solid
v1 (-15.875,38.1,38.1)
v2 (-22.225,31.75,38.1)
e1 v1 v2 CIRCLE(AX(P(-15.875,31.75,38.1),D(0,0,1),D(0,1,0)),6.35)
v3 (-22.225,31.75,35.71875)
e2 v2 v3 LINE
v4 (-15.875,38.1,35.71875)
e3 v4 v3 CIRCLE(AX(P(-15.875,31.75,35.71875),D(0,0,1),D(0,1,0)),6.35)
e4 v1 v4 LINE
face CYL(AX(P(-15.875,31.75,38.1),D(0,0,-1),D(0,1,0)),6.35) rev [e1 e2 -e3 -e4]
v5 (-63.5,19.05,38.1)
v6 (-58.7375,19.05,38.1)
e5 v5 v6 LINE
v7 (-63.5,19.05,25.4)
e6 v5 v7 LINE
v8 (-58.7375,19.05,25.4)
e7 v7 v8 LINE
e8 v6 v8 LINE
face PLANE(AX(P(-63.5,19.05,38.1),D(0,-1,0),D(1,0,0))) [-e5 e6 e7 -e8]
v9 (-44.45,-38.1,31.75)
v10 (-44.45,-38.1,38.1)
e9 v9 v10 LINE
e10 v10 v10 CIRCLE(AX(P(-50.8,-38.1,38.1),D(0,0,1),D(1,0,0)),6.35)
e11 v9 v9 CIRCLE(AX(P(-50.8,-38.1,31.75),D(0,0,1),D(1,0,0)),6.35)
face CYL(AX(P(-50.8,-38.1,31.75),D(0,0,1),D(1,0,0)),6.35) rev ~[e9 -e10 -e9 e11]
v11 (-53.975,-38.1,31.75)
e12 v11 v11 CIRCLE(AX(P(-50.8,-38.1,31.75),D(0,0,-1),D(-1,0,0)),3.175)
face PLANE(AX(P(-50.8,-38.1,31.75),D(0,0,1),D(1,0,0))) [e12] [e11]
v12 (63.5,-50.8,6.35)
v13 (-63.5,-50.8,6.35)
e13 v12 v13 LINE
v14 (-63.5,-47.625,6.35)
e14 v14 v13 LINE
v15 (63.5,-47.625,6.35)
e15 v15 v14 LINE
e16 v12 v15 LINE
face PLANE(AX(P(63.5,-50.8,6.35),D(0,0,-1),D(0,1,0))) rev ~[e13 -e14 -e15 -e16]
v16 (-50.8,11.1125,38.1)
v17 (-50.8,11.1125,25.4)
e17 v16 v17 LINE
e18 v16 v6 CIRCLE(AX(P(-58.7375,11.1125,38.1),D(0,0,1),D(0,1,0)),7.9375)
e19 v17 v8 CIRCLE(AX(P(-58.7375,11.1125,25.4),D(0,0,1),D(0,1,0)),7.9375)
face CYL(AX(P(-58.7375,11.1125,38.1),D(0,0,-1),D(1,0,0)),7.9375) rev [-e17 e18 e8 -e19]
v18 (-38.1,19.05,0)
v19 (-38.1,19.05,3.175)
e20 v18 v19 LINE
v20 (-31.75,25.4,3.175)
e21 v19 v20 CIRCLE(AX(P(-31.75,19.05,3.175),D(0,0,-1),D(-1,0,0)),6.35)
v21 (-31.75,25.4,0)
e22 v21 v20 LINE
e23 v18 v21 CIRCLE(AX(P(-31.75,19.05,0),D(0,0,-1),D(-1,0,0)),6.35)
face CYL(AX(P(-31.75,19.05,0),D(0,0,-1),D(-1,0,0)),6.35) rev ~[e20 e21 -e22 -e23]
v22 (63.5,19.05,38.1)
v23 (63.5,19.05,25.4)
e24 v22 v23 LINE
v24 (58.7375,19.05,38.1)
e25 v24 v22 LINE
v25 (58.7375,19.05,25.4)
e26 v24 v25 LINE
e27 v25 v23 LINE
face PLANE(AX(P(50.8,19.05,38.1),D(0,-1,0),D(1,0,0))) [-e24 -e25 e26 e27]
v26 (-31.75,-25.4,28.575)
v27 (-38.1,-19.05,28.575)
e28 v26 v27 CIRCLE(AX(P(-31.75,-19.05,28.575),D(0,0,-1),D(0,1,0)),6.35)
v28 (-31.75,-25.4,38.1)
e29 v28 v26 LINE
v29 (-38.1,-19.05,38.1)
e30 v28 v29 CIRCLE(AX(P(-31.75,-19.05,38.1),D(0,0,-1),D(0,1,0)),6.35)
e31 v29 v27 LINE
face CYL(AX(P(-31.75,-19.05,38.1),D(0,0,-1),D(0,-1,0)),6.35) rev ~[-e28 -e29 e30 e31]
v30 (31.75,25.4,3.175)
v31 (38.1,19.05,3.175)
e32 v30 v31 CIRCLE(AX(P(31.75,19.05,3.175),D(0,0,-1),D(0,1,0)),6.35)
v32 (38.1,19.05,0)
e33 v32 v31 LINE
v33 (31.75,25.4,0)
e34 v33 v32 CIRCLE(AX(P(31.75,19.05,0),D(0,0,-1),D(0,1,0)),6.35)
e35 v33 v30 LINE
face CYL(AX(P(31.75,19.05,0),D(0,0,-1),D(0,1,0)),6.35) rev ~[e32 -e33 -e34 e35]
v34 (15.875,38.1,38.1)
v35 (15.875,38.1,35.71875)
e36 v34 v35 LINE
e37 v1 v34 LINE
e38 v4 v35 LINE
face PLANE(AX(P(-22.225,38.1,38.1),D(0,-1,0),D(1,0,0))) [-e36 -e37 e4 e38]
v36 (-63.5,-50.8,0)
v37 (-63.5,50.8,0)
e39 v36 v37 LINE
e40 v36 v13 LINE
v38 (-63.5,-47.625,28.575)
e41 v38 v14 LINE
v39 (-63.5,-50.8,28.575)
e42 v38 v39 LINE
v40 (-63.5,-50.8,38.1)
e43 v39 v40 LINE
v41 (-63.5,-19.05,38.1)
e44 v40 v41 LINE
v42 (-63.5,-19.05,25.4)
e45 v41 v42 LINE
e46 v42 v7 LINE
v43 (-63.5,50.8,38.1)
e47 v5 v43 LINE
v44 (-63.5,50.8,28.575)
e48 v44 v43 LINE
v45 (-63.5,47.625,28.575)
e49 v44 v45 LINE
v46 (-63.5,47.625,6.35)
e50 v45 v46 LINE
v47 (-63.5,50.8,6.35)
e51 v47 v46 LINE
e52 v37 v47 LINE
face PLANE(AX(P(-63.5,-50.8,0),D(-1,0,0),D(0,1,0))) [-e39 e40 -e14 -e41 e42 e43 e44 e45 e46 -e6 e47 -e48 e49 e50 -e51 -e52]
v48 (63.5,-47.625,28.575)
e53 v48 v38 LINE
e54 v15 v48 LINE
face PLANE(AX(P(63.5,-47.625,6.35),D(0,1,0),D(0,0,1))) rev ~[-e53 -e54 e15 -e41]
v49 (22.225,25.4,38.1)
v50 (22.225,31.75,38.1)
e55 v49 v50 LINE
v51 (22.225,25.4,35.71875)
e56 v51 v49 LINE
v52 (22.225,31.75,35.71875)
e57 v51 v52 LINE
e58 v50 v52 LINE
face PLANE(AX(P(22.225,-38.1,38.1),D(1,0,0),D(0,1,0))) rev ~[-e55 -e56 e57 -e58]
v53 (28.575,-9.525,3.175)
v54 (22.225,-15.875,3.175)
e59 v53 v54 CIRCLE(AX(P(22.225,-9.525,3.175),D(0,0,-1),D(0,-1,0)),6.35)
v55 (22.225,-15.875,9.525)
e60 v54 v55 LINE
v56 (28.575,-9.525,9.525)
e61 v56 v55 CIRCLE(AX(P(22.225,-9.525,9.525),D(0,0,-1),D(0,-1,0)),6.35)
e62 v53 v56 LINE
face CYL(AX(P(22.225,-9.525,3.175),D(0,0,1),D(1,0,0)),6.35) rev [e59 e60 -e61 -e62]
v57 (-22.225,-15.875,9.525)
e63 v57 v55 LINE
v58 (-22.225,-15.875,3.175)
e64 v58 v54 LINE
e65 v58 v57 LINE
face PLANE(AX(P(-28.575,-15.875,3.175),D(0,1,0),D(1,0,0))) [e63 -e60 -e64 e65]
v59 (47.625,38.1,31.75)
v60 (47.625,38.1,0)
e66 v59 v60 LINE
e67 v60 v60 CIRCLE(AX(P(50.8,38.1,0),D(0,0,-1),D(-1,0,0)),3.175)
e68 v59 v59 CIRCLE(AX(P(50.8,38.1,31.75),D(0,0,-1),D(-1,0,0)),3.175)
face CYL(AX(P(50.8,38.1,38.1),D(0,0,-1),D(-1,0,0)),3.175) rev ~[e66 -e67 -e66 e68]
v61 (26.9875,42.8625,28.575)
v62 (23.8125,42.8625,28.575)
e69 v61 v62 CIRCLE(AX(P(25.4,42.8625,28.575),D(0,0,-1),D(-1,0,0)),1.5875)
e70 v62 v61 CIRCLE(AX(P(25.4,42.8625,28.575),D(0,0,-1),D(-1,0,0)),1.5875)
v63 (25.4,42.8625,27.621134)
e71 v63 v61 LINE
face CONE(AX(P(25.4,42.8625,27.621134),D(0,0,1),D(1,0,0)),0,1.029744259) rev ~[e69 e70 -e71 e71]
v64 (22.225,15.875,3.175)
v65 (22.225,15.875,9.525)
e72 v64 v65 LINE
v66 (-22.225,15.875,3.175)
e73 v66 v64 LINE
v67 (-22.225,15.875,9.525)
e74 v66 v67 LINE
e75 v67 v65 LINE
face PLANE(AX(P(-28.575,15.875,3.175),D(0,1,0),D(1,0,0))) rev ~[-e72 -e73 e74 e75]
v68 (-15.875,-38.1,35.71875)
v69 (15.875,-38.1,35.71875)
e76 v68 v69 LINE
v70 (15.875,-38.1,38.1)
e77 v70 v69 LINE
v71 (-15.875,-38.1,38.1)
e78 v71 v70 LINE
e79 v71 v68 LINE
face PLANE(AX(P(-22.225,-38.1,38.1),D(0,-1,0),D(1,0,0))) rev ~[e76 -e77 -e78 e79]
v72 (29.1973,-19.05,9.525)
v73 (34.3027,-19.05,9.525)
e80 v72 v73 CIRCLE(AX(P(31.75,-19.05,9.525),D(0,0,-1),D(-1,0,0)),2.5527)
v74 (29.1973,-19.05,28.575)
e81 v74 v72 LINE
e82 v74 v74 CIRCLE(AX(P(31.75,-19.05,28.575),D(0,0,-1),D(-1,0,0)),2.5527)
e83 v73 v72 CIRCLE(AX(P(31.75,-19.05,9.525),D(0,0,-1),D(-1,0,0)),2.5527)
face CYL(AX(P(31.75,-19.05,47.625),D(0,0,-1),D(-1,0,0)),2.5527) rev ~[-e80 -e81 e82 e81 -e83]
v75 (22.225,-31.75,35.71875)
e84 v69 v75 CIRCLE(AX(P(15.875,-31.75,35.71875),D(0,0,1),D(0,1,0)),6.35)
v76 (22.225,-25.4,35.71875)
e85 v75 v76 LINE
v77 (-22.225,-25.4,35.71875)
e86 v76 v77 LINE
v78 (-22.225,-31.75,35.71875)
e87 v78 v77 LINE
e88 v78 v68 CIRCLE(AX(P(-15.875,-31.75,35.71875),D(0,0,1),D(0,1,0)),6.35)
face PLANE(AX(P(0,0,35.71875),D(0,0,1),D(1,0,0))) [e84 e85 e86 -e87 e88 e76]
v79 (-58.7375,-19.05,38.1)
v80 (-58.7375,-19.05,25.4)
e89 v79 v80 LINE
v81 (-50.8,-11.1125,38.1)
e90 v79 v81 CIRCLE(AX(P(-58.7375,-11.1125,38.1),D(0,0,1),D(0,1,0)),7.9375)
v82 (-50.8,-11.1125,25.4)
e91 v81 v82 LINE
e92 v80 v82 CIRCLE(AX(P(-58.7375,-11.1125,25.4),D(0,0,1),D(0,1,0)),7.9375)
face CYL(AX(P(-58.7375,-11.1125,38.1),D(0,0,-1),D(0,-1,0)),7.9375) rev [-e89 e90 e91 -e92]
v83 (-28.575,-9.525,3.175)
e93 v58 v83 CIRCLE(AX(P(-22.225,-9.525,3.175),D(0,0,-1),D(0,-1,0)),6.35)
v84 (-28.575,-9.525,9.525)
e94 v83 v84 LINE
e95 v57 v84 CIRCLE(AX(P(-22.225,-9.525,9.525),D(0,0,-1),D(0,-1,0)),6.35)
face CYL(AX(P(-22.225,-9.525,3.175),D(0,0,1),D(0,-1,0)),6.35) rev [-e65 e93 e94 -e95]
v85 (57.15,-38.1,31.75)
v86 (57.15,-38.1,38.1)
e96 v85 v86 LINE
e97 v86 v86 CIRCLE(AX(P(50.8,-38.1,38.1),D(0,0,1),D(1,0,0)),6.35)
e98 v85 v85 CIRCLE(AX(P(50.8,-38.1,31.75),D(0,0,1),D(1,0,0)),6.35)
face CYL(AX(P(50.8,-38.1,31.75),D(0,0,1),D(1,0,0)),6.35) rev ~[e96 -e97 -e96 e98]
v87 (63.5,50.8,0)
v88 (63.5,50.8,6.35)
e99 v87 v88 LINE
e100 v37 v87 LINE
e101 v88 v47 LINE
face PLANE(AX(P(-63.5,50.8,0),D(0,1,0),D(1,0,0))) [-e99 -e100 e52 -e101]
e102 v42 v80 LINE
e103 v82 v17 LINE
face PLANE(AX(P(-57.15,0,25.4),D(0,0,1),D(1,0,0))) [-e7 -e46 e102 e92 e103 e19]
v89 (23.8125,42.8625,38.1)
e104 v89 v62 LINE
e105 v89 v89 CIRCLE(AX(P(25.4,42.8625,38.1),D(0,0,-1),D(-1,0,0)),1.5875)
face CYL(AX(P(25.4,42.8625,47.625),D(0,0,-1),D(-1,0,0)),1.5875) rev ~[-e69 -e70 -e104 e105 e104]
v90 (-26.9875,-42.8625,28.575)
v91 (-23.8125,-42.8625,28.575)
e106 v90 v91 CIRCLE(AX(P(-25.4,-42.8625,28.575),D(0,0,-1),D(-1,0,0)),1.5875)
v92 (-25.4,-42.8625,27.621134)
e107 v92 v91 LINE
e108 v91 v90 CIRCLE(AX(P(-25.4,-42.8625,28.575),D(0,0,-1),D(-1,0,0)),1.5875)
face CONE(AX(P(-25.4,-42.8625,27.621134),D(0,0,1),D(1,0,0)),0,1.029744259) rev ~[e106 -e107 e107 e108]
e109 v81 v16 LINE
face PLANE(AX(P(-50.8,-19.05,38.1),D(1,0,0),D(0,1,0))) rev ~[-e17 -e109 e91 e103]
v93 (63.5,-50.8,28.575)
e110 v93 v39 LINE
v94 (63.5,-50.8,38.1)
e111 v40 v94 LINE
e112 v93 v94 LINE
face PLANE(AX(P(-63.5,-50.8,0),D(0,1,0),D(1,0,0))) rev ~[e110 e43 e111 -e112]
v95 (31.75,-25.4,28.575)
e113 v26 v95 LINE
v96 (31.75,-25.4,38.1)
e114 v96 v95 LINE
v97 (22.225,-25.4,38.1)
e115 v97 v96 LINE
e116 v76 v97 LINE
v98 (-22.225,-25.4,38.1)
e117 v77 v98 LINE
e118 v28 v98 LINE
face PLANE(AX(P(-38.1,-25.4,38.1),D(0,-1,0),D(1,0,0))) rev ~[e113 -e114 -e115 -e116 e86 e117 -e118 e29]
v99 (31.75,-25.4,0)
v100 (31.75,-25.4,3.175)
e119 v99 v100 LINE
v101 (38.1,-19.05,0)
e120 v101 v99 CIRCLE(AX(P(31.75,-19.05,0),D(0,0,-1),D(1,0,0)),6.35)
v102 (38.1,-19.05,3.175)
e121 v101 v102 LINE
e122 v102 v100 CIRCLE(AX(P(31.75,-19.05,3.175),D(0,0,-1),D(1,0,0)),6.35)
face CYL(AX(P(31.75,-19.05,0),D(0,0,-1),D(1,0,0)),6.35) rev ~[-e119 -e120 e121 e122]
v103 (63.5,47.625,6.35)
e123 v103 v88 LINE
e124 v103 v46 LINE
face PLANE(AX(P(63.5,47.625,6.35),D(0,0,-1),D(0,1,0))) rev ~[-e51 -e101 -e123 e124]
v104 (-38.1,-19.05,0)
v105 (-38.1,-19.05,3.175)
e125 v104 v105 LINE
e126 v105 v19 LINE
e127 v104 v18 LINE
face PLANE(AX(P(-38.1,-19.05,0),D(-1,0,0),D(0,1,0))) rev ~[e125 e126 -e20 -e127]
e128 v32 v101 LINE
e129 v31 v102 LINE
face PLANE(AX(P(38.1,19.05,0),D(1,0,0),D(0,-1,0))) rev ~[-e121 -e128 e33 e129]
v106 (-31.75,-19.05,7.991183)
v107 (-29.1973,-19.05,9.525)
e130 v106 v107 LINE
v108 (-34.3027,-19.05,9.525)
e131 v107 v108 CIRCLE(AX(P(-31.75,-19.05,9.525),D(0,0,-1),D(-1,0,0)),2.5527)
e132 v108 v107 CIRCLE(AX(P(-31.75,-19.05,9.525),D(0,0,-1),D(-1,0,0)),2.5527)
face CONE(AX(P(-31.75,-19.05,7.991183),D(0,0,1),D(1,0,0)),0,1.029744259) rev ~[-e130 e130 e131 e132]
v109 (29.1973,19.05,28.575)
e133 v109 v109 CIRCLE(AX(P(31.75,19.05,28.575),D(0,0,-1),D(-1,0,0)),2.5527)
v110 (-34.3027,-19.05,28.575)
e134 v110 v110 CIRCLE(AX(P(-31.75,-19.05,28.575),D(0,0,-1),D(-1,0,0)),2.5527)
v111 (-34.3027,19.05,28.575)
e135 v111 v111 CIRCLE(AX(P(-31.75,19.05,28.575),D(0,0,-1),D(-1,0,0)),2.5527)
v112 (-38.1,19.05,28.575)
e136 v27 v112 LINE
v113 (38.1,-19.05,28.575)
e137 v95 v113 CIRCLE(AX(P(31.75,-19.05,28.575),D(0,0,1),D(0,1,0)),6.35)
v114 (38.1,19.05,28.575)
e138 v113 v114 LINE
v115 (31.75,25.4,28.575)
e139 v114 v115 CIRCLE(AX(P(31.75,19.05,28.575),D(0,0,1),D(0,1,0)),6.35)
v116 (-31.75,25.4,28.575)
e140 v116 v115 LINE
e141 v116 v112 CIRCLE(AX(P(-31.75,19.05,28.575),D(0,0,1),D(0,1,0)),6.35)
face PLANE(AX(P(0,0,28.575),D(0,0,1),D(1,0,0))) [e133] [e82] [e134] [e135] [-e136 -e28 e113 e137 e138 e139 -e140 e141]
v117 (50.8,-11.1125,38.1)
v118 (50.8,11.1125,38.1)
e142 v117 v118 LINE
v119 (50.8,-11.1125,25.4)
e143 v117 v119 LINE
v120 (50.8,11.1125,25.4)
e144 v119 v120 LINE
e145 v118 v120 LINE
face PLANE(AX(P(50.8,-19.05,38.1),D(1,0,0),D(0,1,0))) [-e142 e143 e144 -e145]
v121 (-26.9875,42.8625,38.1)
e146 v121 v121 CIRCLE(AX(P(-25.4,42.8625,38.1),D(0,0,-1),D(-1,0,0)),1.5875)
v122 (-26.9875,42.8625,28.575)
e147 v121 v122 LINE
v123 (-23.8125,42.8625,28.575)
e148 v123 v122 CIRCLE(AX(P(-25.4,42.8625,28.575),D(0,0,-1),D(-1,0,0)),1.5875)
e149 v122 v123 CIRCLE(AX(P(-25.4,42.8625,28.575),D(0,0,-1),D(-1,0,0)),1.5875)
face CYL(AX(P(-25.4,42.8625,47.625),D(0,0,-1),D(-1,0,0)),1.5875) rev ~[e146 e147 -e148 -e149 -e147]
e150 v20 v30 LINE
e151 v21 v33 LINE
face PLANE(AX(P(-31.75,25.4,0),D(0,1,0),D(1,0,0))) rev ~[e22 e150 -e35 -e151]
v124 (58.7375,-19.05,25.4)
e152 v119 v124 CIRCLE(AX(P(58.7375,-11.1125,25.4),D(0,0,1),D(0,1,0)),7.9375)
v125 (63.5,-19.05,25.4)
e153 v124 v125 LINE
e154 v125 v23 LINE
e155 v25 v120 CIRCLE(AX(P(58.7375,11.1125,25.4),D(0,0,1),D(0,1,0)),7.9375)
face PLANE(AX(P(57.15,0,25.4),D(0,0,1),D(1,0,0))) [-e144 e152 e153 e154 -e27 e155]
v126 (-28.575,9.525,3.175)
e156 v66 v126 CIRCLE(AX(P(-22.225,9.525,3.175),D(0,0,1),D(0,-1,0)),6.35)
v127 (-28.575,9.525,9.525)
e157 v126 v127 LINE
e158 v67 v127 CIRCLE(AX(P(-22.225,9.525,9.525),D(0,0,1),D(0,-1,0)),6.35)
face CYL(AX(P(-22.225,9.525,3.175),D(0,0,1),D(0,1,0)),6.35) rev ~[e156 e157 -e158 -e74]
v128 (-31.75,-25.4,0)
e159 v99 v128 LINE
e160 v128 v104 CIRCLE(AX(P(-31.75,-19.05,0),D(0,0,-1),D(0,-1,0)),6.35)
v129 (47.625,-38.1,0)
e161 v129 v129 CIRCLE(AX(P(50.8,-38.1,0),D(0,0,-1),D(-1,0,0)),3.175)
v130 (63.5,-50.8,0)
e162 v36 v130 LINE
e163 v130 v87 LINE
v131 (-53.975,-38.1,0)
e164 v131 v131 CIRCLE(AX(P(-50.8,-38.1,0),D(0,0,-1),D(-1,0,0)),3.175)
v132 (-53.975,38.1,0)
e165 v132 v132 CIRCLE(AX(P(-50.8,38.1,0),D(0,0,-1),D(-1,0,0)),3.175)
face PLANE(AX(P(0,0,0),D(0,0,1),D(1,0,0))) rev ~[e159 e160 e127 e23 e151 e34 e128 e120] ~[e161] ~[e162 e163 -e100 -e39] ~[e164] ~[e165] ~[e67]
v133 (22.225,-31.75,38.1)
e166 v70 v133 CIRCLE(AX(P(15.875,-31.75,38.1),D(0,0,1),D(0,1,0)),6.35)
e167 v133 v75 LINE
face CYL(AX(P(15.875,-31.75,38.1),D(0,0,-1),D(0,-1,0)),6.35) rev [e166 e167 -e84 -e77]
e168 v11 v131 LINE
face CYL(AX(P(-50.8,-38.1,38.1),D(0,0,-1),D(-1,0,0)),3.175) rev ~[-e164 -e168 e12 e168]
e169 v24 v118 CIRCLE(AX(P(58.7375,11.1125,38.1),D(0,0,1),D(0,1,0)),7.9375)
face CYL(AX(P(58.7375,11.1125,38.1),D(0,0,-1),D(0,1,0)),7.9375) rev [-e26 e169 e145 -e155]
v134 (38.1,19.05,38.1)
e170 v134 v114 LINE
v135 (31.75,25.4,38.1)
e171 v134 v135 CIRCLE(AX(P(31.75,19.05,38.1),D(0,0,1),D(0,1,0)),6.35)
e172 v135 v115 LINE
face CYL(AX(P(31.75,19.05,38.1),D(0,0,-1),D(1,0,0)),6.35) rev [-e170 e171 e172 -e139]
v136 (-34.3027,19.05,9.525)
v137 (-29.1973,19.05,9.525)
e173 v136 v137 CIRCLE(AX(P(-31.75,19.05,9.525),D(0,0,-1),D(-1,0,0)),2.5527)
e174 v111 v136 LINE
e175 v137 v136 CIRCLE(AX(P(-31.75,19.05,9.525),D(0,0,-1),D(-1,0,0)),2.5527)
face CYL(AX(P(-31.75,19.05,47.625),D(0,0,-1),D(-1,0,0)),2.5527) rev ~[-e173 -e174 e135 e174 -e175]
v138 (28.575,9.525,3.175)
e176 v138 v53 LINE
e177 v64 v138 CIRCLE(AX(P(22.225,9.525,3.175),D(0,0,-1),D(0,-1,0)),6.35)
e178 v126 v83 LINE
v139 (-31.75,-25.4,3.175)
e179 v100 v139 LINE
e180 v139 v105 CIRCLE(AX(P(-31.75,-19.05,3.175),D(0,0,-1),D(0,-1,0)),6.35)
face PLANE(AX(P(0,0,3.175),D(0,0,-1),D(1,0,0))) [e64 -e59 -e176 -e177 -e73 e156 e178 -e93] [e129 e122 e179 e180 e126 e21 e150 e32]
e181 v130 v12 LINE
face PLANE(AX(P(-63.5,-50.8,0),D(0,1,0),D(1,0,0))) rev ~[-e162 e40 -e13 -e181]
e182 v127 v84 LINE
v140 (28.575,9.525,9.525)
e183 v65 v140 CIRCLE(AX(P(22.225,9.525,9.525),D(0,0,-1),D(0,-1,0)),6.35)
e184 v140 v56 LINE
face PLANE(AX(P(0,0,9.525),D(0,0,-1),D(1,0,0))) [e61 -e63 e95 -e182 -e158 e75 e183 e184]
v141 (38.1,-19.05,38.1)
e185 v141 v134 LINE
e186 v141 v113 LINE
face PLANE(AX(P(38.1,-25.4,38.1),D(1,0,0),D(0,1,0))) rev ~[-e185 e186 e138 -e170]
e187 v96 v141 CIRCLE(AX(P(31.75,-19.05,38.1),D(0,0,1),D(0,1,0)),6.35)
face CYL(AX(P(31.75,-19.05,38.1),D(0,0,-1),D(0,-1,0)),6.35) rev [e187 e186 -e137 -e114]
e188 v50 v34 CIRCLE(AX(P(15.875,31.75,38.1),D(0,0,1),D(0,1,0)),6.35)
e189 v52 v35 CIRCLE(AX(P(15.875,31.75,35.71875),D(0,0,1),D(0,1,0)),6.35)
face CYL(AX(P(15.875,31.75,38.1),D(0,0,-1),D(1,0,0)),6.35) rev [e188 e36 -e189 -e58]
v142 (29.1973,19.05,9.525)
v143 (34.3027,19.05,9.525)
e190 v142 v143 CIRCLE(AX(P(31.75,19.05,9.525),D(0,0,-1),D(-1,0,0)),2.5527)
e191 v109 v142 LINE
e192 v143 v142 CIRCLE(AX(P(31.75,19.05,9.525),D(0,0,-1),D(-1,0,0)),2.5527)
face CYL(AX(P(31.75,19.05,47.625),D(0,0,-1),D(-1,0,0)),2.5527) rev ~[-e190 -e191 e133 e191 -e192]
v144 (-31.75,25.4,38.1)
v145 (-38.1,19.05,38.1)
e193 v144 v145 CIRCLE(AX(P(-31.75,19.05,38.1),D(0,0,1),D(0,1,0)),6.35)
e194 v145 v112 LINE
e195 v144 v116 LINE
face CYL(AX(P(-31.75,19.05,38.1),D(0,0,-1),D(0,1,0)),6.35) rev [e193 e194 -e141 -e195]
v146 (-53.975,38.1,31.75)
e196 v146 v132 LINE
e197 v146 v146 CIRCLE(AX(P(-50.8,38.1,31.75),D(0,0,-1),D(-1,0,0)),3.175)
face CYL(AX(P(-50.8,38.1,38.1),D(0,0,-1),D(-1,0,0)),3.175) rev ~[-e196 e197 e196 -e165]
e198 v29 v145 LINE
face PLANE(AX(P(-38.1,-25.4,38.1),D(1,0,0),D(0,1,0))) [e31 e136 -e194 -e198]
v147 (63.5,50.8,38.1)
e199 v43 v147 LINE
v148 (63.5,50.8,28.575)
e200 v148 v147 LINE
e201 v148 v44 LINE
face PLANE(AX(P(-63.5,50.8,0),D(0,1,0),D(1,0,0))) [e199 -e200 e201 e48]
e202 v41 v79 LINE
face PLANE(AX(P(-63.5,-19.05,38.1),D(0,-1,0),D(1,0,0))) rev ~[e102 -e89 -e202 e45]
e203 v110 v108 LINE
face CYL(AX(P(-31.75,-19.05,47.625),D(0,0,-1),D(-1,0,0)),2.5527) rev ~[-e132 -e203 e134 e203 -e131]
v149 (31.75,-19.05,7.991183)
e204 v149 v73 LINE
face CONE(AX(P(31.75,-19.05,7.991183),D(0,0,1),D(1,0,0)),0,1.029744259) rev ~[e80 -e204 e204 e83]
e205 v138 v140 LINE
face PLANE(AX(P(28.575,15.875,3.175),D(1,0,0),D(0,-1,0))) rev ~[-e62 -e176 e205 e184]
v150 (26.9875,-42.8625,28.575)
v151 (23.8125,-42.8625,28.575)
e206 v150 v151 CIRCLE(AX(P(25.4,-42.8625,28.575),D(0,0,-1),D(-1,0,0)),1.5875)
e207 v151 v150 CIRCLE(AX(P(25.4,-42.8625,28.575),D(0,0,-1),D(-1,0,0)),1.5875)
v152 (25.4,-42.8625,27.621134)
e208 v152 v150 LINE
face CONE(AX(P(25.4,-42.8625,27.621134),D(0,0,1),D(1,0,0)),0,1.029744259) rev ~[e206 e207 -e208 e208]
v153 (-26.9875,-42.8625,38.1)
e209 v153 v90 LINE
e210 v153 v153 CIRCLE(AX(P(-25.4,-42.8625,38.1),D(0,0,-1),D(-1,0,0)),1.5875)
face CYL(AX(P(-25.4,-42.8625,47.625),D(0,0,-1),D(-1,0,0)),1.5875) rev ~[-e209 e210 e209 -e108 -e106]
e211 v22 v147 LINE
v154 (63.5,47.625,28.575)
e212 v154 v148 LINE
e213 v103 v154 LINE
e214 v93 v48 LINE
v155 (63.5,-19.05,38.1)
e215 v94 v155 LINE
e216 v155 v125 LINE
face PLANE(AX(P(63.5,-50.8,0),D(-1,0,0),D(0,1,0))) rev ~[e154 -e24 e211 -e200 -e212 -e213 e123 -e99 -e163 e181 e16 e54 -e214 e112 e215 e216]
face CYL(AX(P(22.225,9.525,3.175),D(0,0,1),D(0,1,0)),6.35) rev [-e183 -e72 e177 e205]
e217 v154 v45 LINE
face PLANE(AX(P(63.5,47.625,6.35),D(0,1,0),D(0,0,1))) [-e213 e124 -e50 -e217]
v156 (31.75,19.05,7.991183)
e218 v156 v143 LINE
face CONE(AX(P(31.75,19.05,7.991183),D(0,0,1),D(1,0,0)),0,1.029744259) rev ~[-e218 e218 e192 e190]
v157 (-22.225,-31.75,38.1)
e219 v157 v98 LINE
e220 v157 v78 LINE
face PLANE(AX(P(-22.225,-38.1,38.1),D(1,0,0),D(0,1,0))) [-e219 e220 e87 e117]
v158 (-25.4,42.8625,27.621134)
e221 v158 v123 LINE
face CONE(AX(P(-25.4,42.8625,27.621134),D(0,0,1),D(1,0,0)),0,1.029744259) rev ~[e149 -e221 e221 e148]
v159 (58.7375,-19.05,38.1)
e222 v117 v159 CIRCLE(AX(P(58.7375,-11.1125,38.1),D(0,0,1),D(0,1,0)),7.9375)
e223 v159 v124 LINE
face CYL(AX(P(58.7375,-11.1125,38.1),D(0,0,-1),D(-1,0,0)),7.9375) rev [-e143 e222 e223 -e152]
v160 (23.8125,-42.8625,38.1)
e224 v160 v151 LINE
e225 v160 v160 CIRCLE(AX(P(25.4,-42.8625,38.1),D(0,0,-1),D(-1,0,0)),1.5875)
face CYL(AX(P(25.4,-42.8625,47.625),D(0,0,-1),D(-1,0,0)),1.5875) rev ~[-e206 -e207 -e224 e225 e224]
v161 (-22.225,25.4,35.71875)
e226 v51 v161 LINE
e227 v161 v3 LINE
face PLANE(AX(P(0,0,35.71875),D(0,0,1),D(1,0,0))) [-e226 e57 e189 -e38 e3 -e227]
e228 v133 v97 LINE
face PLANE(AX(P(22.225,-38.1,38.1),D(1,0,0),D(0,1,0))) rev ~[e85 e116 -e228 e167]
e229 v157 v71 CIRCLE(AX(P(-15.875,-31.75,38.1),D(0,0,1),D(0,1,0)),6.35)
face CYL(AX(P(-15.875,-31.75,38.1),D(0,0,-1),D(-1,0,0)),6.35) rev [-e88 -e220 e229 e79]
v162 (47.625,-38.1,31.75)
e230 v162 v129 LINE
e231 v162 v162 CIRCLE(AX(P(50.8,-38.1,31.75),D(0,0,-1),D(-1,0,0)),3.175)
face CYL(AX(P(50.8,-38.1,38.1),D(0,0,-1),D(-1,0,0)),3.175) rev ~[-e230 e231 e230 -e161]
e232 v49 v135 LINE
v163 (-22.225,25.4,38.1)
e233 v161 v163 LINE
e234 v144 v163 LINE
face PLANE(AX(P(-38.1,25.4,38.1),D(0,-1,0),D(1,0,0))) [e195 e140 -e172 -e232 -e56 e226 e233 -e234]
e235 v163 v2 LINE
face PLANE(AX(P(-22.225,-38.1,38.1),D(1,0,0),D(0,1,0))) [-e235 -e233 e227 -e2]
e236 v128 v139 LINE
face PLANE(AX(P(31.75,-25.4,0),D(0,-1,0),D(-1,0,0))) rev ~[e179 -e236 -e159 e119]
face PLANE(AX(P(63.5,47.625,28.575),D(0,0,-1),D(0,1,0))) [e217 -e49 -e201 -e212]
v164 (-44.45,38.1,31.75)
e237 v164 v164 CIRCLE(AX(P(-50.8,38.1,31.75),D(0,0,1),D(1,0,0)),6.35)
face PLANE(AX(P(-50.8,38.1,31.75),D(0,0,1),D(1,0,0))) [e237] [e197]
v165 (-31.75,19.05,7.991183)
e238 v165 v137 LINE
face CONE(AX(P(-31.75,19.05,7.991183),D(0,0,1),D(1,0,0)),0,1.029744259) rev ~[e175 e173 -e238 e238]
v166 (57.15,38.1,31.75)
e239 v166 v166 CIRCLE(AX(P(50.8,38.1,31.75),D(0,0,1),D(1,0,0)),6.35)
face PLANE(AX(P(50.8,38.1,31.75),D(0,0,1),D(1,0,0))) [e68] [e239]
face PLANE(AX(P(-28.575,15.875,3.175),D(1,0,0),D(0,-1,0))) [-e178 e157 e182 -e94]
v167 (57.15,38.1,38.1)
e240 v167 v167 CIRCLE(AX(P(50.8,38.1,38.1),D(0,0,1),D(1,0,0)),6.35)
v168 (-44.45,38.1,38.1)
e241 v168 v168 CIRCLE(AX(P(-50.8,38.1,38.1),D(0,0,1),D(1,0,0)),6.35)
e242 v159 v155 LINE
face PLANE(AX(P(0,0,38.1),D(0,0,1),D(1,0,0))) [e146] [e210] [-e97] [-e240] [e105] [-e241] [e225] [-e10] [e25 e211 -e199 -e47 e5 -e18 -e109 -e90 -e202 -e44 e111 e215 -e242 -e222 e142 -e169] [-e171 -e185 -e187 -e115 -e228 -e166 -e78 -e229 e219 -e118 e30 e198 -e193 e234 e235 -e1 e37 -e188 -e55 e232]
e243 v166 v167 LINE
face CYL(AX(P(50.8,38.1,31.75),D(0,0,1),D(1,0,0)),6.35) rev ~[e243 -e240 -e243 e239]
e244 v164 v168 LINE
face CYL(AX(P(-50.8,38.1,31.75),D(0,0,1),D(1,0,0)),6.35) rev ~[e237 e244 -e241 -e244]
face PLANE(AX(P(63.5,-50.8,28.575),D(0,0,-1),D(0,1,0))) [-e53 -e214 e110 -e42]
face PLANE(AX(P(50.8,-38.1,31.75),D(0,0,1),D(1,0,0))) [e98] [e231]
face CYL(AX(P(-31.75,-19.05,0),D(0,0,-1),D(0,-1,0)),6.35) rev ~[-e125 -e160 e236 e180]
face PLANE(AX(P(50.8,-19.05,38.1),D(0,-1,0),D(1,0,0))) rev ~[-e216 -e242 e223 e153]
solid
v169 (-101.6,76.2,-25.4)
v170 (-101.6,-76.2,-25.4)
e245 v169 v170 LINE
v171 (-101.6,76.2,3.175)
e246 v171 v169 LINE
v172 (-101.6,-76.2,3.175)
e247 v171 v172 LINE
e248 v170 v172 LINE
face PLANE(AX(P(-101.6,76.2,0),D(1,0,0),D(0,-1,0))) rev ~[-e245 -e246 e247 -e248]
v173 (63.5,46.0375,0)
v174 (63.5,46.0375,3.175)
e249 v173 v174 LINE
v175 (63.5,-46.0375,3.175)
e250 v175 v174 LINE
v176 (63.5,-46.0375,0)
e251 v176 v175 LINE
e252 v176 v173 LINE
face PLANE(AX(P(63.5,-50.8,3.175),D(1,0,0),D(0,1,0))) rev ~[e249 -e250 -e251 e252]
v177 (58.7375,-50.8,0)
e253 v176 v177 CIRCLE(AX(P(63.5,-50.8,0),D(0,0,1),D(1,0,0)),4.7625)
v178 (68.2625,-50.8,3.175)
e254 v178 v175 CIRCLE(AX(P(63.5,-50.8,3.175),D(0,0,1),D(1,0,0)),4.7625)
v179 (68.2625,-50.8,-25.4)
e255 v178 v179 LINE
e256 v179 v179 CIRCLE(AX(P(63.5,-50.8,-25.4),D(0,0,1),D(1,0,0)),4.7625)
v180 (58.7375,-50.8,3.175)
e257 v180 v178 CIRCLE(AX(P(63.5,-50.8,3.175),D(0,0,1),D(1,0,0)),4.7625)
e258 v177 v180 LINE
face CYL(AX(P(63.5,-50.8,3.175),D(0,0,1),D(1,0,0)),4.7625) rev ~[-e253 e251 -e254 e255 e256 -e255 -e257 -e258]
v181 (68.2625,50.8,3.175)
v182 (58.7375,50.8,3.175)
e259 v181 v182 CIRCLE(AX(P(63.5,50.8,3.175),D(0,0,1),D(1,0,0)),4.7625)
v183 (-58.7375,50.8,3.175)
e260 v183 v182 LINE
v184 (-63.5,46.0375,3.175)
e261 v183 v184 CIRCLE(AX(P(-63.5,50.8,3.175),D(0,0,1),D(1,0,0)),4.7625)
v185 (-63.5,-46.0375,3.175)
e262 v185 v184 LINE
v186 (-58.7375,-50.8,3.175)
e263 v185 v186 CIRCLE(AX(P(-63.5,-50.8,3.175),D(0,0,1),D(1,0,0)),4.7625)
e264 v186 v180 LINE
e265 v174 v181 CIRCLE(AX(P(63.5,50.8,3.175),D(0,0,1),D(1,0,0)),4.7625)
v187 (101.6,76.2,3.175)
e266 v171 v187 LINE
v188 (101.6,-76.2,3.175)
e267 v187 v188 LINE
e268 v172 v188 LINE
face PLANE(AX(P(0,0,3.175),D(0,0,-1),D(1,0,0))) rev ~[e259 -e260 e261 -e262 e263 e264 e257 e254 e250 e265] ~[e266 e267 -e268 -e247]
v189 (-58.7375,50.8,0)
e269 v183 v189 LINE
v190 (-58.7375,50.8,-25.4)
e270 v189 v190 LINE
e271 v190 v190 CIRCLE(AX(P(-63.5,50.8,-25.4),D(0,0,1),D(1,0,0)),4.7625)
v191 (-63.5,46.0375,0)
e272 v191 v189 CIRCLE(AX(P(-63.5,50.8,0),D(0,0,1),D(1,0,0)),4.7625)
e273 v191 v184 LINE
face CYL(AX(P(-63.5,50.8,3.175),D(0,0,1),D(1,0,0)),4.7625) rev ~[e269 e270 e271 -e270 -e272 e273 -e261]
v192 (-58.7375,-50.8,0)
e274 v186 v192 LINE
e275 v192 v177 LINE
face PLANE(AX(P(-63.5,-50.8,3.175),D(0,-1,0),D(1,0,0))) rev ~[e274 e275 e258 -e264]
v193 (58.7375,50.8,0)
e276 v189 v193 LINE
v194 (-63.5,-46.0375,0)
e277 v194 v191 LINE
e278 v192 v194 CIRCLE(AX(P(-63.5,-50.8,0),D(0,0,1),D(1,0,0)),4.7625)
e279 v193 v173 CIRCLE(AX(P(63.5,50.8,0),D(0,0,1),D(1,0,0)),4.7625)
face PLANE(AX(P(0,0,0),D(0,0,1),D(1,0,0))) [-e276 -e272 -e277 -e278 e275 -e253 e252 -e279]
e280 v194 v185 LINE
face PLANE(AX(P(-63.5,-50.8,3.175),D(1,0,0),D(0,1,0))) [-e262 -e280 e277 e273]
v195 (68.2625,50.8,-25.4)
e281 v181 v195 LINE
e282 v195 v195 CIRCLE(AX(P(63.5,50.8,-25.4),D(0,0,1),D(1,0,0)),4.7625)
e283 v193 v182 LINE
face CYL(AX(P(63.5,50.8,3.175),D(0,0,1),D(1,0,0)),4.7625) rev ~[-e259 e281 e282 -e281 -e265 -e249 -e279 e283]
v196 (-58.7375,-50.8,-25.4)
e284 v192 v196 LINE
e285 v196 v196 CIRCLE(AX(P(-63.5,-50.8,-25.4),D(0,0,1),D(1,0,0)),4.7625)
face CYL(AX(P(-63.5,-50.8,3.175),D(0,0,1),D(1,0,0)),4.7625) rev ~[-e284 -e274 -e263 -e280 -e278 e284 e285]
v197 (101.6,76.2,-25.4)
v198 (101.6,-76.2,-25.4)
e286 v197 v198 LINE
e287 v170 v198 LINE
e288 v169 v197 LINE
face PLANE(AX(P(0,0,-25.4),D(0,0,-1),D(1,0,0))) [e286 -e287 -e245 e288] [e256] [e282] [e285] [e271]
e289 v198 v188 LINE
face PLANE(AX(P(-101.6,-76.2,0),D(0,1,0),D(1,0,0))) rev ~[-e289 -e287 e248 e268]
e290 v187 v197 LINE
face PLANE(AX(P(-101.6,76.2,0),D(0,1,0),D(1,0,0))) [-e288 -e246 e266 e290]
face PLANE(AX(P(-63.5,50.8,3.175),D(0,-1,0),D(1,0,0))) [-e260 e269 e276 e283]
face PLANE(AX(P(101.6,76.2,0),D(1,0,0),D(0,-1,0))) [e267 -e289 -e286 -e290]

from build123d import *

# Parameters (mm, degrees)
F0_W           = 127
F0_H           = 101.6
F1_DEPTH       = 38.1
F2_W           = 76.2
F2_H           = 50.8
F3_DEPTH       = 9.525
F4_R           = 6.35
F6_D           = 6.35
F6_CBORE_D     = 12.7
F6_CBORE_DEPTH = 6.35
F7_W           = 3.175
F7_H           = 22.225
F8_DEPTH       = 127.001
F10_D          = 5.1054
F10_DEPTH      = 19.05
F10_TIP        = 1.5338169022
F11_W          = 12.7
F11_H          = 38.1
F12_DEPTH      = 12.7
F13_R          = 7.9375
F15_DEPTH      = 3.175
F16_W          = 57.15
F16_H          = 31.75
F17_DEPTH      = 6.35
F18_R          = 6.35
F20_D          = 3.175
F20_DEPTH      = 9.525
F20_TIP        = 0.9538662327
F21_W          = 44.45
F21_H          = 76.2
F22_DEPTH      = 2.38125
F23_R          = 6.35
F24_W          = 203.2
F24_H          = 152.4
F25_DEPTH      = 25.4
F25_DEPTH_BACK = 3.175
F26_W          = 127
F26_H          = 101.6
F27_DEPTH      = 3.175
F28_R          = 4.7625
F29_DEPTH      = 28.576


with BuildPart() as f1:
    # F0 (on Top) → F1 (new body)
    with BuildSketch(Plane.XY):
        Rectangle(F0_W, F0_H)
    extrude(amount=F1_DEPTH)

    # F2 (on face) → F3 (cut)
    with BuildSketch(Plane.XY.offset(38.1)):
        Rectangle(F2_W, F2_H)
    extrude(amount=-F3_DEPTH, mode=Mode.SUBTRACT)

    # F4
    f4_edges = [f1.edges().sort_by_distance(p)[0] for p in [
        (-38.1, 25.4, 33.3375),
        (38.1, 25.4, 33.3375),
        (38.1, -25.4, 33.3375),
        (-38.1, -25.4, 33.3375),
    ]]
    fillet(f4_edges, radius=F4_R)

    # F6 (through all)
    with Locations(Plane.XY.offset(38.1)):
        with Locations((-50.8, 38.1), (50.8, 38.1), (50.8, -38.1), (-50.8, -38.1)):
            CounterBoreHole(F6_D / 2, F6_CBORE_D / 2, F6_CBORE_DEPTH)

    # F7 (on face) → F8 (cut, through all)
    with BuildSketch(Plane.YZ.offset(63.5)):
        with Locations((-49.2125, 17.4625)):
            Rectangle(F7_W, F7_H)
        with Locations((49.2125, 17.4625)):
            Rectangle(F7_W, F7_H)
    extrude(amount=-F8_DEPTH, mode=Mode.SUBTRACT)

    # F10
    with Locations(Plane.XY.offset(28.575)):
        with Locations((-31.75, 19.05), (-31.75, -19.05), (31.75, -19.05), (31.75, 19.05)):
            Hole(F10_D / 2, depth=F10_DEPTH)
            with Locations((0, 0, -(F10_DEPTH + F10_TIP / 2))):  # 118° drill point
                Cone(0, F10_D / 2, F10_TIP, mode=Mode.SUBTRACT)

    # F11 (on face) → F12 (cut)
    with BuildSketch(Plane.XY.offset(38.1)):
        with Locations((-57.15, 0)):
            Rectangle(F11_W, F11_H)
        with Locations((57.15, 0)):
            Rectangle(F11_W, F11_H)
    extrude(amount=-F12_DEPTH, mode=Mode.SUBTRACT)

    # F13
    f13_edges = [f1.edges().sort_by_distance(p)[0] for p in [
        (-50.8, 19.05, 31.75),
        (-50.8, -19.05, 31.75),
        (50.8, 19.05, 31.75),
        (50.8, -19.05, 31.75),
    ]]
    fillet(f13_edges, radius=F13_R)

    # F14 (on face) → F15 (cut)
    with BuildSketch(Plane(origin=(0, 0, 0), x_dir=(1, 0, 0), z_dir=(0, 0, -1))):
        with BuildLine():
            Line((-31.75, -25.4), (31.75, -25.4))
            ThreePointArc((31.75, -25.4), (36.2401280605, -23.5401280605), (38.1, -19.05))
            Line((38.1, -19.05), (38.1, 19.05))
            ThreePointArc((38.1, 19.05), (36.2401280605, 23.5401280605), (31.75, 25.4))
            Line((31.75, 25.4), (-31.75, 25.4))
            ThreePointArc((-31.75, 25.4), (-36.2401280605, 23.5401280605), (-38.1, 19.05))
            Line((-38.1, 19.05), (-38.1, -19.05))
            ThreePointArc((-38.1, -19.05), (-36.2401280605, -23.5401280605), (-31.75, -25.4))
        make_face()
    extrude(amount=-F15_DEPTH, mode=Mode.SUBTRACT)

    # F16 (on face) → F17 (cut)
    with BuildSketch(Plane(origin=(0, 0, 3.175), x_dir=(1, 0, 0), z_dir=(0, 0, -1))):
        Rectangle(F16_W, F16_H)
    extrude(amount=-F17_DEPTH, mode=Mode.SUBTRACT)

    # F18
    f18_edges = [f1.edges().sort_by_distance(p)[0] for p in [
        (-28.575, -15.875, 6.35),
        (-28.575, 15.875, 6.35),
        (28.575, -15.875, 6.35),
        (28.575, 15.875, 6.35),
    ]]
    fillet(f18_edges, radius=F18_R)

    # F20
    with Locations(Plane.XY.offset(38.1)):
        with Locations((-25.4, 42.8625), (25.4, 42.8625), (-25.4, -42.8625), (25.4, -42.8625)):
            Hole(F20_D / 2, depth=F20_DEPTH)
            with Locations((0, 0, -(F20_DEPTH + F20_TIP / 2))):  # 118° drill point
                Cone(0, F20_D / 2, F20_TIP, mode=Mode.SUBTRACT)

    # F21 (on face) → F22 (cut)
    with BuildSketch(Plane.XY.offset(38.1)):
        Rectangle(F21_W, F21_H)
    extrude(amount=-F22_DEPTH, mode=Mode.SUBTRACT)

    # F23
    f23_edges = [f1.edges().sort_by_distance(p)[0] for p in [
        (-22.225, 38.1, 36.909375),
        (22.225, 38.1, 36.909375),
        (22.225, -38.1, 36.909375),
        (-22.225, -38.1, 36.909375),
    ]]
    fillet(f23_edges, radius=F23_R)


with BuildPart() as f25:
    # F24 (on face) → F25 (new body, two sides)
    with BuildSketch(Plane(origin=(0, 0, 0), x_dir=(1, 0, 0), z_dir=(0, 0, -1))) as f25_sk:
        Rectangle(F24_W, F24_H)
    extrude(amount=F25_DEPTH)
    extrude(f25_sk.sketch, amount=-F25_DEPTH_BACK)

    # F26 (on face) → F27 (cut)
    with BuildSketch(Plane.XY.offset(3.175)):
        Rectangle(F26_W, F26_H)
    extrude(amount=-F27_DEPTH, mode=Mode.SUBTRACT)

    # F28 (on face) → F29 (cut, through all)
    with BuildSketch(Plane.XY.offset(3.175)):
        with Locations((-63.5, 50.8)):
            Circle(F28_R)
        with Locations((-63.5, -50.8)):
            Circle(F28_R)
        with Locations((63.5, 50.8)):
            Circle(F28_R)
        with Locations((63.5, -50.8)):
            Circle(F28_R)
    extrude(amount=-F29_DEPTH, mode=Mode.SUBTRACT)


solid = Compound([f1.part, f25.part])
